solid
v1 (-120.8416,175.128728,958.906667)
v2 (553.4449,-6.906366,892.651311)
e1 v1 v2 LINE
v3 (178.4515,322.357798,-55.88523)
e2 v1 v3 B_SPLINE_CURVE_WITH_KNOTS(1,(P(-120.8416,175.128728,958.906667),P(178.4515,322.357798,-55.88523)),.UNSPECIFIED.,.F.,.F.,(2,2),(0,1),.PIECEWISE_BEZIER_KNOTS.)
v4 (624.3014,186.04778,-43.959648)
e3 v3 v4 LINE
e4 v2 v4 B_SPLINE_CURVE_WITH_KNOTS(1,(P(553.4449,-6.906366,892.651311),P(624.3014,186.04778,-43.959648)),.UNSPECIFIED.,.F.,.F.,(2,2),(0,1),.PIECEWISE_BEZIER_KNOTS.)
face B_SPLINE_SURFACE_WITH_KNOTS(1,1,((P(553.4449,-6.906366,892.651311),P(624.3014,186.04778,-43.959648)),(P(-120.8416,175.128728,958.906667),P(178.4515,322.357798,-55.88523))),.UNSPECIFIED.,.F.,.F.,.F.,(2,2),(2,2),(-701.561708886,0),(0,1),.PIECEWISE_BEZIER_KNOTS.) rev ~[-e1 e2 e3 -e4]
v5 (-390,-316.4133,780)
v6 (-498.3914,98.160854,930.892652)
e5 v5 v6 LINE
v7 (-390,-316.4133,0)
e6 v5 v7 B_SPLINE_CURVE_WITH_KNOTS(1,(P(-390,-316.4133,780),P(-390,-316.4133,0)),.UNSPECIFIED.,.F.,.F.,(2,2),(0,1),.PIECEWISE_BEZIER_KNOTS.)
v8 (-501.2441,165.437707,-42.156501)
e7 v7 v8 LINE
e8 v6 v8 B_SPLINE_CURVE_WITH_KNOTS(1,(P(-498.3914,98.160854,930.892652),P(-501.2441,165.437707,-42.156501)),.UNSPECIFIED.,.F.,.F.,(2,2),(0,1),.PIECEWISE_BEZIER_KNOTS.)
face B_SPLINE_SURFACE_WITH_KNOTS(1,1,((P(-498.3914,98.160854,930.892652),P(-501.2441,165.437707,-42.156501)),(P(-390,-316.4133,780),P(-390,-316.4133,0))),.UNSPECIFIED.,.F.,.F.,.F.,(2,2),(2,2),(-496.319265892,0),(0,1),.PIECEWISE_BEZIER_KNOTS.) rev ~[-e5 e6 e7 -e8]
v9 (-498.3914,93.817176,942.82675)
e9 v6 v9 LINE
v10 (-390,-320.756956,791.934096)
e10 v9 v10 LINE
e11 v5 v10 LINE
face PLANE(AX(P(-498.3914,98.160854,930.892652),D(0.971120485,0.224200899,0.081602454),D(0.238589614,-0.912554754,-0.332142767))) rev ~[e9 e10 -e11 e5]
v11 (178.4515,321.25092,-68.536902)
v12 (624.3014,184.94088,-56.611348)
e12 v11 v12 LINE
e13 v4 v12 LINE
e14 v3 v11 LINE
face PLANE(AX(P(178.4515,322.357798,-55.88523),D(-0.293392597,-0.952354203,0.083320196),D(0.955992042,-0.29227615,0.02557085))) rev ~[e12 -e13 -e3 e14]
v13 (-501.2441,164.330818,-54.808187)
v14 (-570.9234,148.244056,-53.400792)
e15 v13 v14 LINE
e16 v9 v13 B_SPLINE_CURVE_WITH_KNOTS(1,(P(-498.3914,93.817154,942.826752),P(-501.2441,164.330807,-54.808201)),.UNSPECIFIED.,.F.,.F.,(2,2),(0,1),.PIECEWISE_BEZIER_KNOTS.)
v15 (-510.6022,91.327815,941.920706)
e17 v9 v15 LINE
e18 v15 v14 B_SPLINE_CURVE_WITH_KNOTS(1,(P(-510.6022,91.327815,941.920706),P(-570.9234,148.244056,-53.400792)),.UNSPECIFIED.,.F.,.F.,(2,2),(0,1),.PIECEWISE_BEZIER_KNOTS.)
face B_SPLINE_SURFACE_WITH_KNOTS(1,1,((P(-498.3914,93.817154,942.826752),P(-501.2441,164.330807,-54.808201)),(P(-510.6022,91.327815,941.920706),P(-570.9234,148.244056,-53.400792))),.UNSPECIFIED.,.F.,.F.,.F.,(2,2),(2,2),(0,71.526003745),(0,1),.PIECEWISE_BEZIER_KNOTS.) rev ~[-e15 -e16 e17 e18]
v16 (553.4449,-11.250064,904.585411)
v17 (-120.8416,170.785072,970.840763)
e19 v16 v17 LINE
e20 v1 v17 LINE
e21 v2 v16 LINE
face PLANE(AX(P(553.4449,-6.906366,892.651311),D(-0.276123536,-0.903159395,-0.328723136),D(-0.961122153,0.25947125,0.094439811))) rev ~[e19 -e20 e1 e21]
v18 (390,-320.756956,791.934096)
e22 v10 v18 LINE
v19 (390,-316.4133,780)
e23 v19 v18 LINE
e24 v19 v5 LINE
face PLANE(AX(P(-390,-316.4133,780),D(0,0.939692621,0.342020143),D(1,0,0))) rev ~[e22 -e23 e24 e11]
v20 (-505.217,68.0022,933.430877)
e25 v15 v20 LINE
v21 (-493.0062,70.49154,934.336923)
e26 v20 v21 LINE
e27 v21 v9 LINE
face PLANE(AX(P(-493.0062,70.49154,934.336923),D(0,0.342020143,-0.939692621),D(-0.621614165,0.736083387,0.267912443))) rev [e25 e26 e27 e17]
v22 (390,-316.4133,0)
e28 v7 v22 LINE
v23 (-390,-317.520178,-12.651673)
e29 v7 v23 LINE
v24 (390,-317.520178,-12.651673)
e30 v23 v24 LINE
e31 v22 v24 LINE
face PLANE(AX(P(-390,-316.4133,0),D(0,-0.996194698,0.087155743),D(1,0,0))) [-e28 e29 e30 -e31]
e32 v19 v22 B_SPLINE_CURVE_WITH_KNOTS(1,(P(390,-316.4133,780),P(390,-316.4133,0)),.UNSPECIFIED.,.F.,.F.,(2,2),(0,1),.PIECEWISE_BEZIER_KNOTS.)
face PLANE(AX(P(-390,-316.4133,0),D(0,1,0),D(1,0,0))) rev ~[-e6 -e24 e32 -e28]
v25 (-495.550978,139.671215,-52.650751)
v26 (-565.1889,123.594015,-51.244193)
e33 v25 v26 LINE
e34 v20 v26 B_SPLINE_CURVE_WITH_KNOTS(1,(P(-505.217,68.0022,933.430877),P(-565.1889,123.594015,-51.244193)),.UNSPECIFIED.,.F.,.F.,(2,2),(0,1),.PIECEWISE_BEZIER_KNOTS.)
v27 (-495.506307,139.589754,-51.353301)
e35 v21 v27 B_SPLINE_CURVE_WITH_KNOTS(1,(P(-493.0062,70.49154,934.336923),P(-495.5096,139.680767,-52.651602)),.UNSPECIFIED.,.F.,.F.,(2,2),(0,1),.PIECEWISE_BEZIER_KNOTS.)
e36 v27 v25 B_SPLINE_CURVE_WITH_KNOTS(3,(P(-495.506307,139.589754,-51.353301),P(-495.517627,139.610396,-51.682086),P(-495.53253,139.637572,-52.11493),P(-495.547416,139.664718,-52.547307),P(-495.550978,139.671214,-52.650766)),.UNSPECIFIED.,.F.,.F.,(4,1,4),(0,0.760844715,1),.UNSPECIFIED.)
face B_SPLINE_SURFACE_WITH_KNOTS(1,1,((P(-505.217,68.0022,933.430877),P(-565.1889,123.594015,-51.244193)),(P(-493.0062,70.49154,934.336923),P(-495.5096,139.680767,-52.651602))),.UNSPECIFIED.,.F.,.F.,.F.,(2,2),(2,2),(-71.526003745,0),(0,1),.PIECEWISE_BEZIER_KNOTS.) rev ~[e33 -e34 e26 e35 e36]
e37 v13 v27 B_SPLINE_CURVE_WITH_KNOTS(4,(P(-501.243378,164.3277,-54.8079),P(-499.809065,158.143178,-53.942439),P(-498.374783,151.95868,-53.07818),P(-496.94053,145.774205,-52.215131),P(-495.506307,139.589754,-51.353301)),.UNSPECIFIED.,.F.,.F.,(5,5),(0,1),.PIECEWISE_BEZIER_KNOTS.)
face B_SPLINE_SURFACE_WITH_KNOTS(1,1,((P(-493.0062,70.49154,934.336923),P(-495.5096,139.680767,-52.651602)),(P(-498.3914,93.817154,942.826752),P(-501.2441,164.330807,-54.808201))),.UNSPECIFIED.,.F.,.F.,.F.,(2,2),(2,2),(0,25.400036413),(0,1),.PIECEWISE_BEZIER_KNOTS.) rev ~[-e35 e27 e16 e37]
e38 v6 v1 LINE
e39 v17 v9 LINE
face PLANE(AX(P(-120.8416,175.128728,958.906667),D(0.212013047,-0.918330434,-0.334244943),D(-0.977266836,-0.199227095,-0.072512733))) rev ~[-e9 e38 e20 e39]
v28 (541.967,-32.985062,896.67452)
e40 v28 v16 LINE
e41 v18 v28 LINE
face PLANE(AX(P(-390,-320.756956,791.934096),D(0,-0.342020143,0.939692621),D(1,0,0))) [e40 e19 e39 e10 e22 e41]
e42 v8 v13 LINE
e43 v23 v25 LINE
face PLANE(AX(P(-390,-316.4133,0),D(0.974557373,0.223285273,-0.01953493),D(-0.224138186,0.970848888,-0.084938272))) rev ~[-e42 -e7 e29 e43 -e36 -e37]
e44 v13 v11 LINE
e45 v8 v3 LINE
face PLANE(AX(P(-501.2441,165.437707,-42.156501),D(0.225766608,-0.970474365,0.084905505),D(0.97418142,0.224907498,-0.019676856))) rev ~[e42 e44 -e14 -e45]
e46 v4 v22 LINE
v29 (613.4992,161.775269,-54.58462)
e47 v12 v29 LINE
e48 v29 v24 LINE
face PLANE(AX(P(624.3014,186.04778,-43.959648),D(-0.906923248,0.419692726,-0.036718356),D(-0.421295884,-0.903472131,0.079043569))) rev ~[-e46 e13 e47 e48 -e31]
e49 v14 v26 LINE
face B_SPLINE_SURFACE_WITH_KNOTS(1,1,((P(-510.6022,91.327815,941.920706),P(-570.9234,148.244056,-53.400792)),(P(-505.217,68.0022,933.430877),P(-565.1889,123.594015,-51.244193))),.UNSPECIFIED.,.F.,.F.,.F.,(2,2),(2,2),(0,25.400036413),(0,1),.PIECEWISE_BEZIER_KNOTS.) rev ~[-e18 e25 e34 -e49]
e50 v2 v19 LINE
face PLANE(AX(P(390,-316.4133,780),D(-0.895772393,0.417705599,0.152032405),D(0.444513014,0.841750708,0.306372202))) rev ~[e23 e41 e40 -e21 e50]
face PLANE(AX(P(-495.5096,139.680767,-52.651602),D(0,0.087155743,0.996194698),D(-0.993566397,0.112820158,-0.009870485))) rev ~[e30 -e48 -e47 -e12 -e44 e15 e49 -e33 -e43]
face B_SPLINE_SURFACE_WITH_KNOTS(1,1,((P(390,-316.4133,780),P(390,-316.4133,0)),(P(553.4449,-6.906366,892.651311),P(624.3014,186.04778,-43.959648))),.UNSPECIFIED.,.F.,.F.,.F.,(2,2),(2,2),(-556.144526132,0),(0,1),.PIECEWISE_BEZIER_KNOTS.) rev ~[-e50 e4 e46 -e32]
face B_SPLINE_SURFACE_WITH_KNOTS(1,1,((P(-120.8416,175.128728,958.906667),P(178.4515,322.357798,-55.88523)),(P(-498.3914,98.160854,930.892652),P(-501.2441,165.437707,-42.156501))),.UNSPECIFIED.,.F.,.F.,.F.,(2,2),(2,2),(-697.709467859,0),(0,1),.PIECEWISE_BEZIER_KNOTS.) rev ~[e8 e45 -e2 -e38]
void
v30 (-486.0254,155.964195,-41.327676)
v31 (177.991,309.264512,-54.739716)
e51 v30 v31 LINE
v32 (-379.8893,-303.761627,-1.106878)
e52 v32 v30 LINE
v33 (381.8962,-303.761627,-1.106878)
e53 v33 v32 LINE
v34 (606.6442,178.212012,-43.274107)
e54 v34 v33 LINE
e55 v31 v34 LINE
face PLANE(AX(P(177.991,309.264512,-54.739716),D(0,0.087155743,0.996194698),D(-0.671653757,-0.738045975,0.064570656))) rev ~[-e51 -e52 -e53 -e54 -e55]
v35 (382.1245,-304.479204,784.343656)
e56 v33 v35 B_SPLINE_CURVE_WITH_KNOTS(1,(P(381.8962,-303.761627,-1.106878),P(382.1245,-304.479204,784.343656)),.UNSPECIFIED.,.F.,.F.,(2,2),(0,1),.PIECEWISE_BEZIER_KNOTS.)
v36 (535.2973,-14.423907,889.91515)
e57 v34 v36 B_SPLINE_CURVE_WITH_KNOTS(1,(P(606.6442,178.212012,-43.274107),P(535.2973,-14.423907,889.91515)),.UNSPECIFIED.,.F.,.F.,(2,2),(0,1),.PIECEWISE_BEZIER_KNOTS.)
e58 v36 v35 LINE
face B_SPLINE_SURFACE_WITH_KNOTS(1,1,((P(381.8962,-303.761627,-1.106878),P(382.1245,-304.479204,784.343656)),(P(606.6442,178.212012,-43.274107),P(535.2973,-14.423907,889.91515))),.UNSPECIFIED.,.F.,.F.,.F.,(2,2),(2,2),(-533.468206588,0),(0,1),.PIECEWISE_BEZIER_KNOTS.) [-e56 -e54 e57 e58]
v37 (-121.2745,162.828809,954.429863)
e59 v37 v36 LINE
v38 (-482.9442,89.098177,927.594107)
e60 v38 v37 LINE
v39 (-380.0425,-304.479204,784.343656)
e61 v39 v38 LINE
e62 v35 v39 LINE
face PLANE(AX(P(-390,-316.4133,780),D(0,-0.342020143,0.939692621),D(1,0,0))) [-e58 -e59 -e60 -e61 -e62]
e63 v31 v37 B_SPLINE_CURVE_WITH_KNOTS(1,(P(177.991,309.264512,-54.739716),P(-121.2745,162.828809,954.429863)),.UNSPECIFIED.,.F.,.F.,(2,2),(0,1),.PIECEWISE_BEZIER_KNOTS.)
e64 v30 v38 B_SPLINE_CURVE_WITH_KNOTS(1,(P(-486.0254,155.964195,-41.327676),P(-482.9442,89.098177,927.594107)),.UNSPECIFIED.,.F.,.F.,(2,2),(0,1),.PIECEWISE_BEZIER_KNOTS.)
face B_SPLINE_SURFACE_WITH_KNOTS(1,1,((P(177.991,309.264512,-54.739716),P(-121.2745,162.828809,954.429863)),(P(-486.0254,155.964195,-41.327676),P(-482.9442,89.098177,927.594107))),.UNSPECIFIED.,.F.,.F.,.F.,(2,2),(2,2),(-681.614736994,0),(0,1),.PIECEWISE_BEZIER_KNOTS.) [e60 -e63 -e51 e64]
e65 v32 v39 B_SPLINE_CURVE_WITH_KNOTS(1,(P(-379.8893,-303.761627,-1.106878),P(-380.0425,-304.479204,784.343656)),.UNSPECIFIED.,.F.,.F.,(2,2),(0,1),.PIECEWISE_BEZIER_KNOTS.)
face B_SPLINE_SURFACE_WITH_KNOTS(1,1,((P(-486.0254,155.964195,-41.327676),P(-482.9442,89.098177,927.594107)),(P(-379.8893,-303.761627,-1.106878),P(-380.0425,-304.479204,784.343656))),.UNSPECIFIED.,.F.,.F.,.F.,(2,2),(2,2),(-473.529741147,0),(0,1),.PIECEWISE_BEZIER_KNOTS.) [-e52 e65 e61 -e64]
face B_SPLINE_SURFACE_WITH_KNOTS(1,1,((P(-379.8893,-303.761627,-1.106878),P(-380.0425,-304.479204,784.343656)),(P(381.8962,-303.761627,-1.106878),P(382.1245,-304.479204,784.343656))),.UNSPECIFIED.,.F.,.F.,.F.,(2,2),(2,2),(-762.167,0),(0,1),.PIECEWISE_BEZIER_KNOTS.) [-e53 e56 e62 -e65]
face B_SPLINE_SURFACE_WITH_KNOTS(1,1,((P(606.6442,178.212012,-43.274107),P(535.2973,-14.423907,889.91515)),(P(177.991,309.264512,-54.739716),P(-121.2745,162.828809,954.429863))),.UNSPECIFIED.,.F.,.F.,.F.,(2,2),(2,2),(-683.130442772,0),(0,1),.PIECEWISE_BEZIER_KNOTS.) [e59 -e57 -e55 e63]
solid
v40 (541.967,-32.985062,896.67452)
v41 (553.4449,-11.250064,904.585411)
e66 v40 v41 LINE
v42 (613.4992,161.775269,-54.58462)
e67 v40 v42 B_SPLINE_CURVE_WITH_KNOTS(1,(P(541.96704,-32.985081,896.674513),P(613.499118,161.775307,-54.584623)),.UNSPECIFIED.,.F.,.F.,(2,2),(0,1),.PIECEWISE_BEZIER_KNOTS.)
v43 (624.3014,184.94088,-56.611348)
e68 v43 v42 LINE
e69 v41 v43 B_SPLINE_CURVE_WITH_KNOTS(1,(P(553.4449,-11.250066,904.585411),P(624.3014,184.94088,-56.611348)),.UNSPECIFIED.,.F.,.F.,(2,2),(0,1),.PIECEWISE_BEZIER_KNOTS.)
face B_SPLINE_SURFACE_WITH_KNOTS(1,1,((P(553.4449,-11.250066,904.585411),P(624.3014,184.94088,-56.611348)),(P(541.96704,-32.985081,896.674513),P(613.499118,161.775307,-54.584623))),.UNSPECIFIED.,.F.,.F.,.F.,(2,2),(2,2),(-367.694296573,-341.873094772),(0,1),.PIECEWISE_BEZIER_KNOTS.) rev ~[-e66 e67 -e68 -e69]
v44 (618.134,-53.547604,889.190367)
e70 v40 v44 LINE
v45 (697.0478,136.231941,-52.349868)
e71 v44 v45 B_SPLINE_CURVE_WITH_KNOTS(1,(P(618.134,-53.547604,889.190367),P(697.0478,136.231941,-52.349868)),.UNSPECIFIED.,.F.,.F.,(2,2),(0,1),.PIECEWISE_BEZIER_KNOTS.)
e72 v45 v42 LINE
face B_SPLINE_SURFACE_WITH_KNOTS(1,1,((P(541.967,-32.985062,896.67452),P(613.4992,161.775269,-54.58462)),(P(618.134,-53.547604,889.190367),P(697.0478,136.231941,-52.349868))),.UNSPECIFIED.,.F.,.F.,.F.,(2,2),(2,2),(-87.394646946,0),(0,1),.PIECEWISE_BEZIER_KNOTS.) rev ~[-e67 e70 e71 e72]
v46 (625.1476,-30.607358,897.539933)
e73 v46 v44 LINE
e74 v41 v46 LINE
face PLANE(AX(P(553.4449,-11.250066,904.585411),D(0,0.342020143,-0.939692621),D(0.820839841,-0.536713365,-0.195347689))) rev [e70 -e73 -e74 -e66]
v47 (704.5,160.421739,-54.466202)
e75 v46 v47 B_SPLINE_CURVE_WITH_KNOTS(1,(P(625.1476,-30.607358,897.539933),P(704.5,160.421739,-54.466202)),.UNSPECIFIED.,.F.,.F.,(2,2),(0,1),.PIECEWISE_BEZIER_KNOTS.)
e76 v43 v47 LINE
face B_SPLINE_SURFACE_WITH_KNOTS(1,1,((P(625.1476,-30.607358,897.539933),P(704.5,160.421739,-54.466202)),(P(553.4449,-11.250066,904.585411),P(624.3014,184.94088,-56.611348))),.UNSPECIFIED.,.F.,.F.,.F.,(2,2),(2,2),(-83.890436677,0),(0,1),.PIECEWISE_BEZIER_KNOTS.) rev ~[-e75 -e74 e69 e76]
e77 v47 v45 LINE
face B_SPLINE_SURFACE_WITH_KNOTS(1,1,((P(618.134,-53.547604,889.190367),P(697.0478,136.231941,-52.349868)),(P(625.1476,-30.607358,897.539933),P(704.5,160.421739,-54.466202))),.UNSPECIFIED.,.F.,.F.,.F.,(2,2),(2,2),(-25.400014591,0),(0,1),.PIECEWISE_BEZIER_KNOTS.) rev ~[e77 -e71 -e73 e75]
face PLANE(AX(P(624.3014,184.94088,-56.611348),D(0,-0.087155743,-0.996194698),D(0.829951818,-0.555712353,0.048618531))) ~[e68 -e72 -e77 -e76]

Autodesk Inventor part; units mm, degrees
ref_plane "YZ Plane" through (0, 0, 0) normal (1, 0, 0) x (0, 1, 0)
sketch "Sketch1" plane through (0, 0, 0) normal (0, 0, 1) x (1, 0, 0)
  line L0 (-390, -316.4133) -> (390, -316.4133)
  line L1 (390, -316.4133) -> (624.3014, 186.0477)
  line L2 (624.3014, 186.0477) -> (178.4515, 322.3577)
  line L3 (178.4515, 322.3577) -> (-501.2441, 165.4377)
  line L4 (-501.2441, 165.4377) -> (-390, -316.4133)
  point P0 (0, 0)
  point P1 (0, -316.4133)
  dimension "d4" = 780
  dimension "d5" = 103
  dimension "d6" = 150
  dimension "d7" = 82
  dimension "d8" = 115
  dimension "d9" = 90
ref_plane "Work Plane1" through (0, 0, 780) normal (0, 0, 1) x (1, 0, 0)
sketch "Sketch2" plane through (0, 0, 780) normal (0, 0, 1) x (1, 0, 0)
  line L0 (-390, -316.4133) -> (390, -316.4133) projected
  line L1 (-390, -316.4133) -> (-498.3914, 153.0812)
  line L2 (-498.3914, 153.0812) -> (-120.8416, 240.2454)
  line L3 (-120.8416, 240.2454) -> (553.4449, 34.0954)
  line L4 (553.4449, 34.0954) -> (390, -316.4133)
  point P0 (0, 0)
  dimension "d14" = 82
  dimension "d57" = 103
  dimension "d58" = 115
ref_plane "Work Plane2" through (-390, -316.4133, 0) normal (0, 0.0871557, 0.9961947) x (1, 0, 0)
sketch "Sketch6" plane through (-390, -316.4133, 0) normal (0, 0.0871557, 0.9961947) x (1, 0, 0)
  line L0 (568.4515, 641.2111) -> (1014.3014, 504.3804) projected
  line L1 (-111.2441, 483.6916) -> (568.4515, 641.2111) projected
  line L2 (0, 0) -> (-111.2441, 483.6916) projected
  line L3 (0, 0) -> (780, 0) projected
  line L4 (1014.3014, 504.3804) -> (780, 0) projected
  point P0 (390, 315.2093)
extrude "Extrusion2" add sketch "Sketch6" against normal blind 12.7
ref_plane "Work Plane3" through (-390, -316.4133, 780) normal (0, -0.3420201, 0.9396926) x (1, 0, 0)
sketch "Sketch7" plane through (-390, -316.4133, 780) normal (0, -0.3420201, 0.9396926) x (1, 0, 0)
  line L0 (-108.3914, 441.1806) -> (269.1584, 523.0881) projected
  line L1 (0, 0) -> (-108.3914, 441.1806) projected
  line L2 (269.1584, 523.0881) -> (943.4449, 329.3704) projected
  line L3 (943.4449, 329.3704) -> (780, 0) projected
  line L4 (-108.3914, 441.1806) -> (0, 0)
  line L5 (780, 0) -> (0, 0)
  line L6 (780, 0) -> (943.4449, 329.3704)
  line L7 (943.4449, 329.3704) -> (269.1584, 523.0881)
  line L8 (269.1584, 523.0881) -> (-108.3914, 441.1806)
  point P0 (390, 30.5555)
loft "Loft3" add profiles "Sketch7" section 2 edges at (401.3765, 254.2027, -49.9224) (-161.3963, 243.8977, -49.0209) (-445.622, -75.4878, -21.0782) (0, -316.4133, 0) (507.1507, -65.1828, -21.9798)
sketch "Sketch8" plane through (-390, -316.4133, 0) normal (0, 0.0871557, 0.9961947) x (1, 0, 0)
  line L0 (568.4515, 641.2111) -> (1014.3014, 504.3804) construction
  line L1 (1014.3014, 504.3804) -> (780, 0) construction
  line L2 (780, 0) -> (0, 0) construction
  line L3 (0, 0) -> (-111.2441, 483.6916) construction
  line L4 (-111.2441, 483.6916) -> (568.4515, 641.2111) construction
  line L5 (567.991, 628.0678) -> (996.6442, 496.5147)
  line L6 (996.6442, 496.5147) -> (771.8962, 12.7)
  line L7 (771.8962, 12.7) -> (10.1107, 12.7)
  line L8 (10.1107, 12.7) -> (-96.0254, 474.1819)
  line L9 (-96.0254, 474.1819) -> (567.991, 628.0678)
  point P0 (390, 315.2093)
  dimension "d37" = 12.7
sketch "Sketch9" plane through (-390, -316.4133, 780) normal (0, -0.3420201, 0.9396926) x (1, 0, 0)
  line L0 (-108.3914, 441.1806) -> (0, 0) construction
  line L1 (0, 0) -> (780, 0) construction
  line L2 (780, 0) -> (943.4449, 329.3704) construction
  line L3 (943.4449, 329.3704) -> (269.1584, 523.0881) construction
  line L4 (269.1584, 523.0881) -> (-108.3914, 441.1806) construction
  line L5 (268.7255, 509.9988) -> (925.2973, 321.3704)
  line L6 (925.2973, 321.3704) -> (772.1245, 12.7)
  line L7 (772.1245, 12.7) -> (9.9575, 12.7)
  line L8 (9.9575, 12.7) -> (-92.9442, 431.5363)
  line L9 (-92.9442, 431.5363) -> (268.7255, 509.9988)
  point P0 (390, 30.5555)
  dimension "d38" = 12.7
loft "Loft4" cut profiles "Sketch8", "Sketch9"
sketch "Sketch10" plane through (-390, -316.4133, 780) normal (0, -0.3420201, 0.9396926) x (1, 0, 0)
  line L0 (943.4449, 329.3704) -> (269.1584, 523.0881) projected
  line L1 (269.1584, 523.0881) -> (-108.3914, 441.1806) projected
  line L2 (-108.3914, 441.1806) -> (0, 0) projected
  line L3 (0, 0) -> (780, 0) projected
  line L4 (780, 0) -> (943.4449, 329.3704) projected
  point P0 (390, 30.5555)
extrude "Extrusion3" add sketch "Sketch10" along normal blind 12.7
sketch "Sketch11" plane through (-390, -317.5202, -12.6517) normal (0, -0.0871557, -0.9961947) x (-1, 0, 0)
  line L0 (-1014.3014, 504.3804) -> (-568.4515, 641.2111) projected
  line L1 (-1014.3014, 504.3804) -> (-1094.5, 479.7676)
  line L2 (-1094.5, 479.7676) -> (-1087.0478, 455.4854)
  line L3 (-1087.0478, 455.4854) -> (-1003.4992, 481.1263)
  line L4 (-780, 0) -> (-1014.3014, 504.3804) projected
  line L5 (-943.4449, 230.5295) -> (-1014.3014, 504.3804) projected
  line L6 (-1003.4992, 481.1263) -> (-1014.3014, 504.3804)
  point P0 (-390, 315.2093)
  dimension "d46" = 25.4
sketch "Sketch12" plane through (-390, -320.757, 791.9341) normal (0, -0.3420201, 0.9396926) x (1, 0, 0)
  line L0 (943.4449, 329.3704) -> (1014.3014, 190.3481) projected
  line L1 (943.4449, 329.3704) -> (1015.1476, 308.7708)
  line L2 (943.4449, 329.3704) -> (269.1584, 523.0881) projected
  line L3 (1015.1476, 308.7708) -> (1008.134, 284.3583)
  line L4 (1008.134, 284.3583) -> (931.967, 306.2405)
  line L5 (780, 0) -> (943.4449, 329.3704) projected
  line L6 (931.967, 306.2405) -> (943.4449, 329.3704)
  point P0 (390, 30.5555)
  dimension "d45" = 25.4
loft "Loft5" add profiles "Sketch12", "Sketch11"
sketch "Sketch13" plane through (-390, -320.757, 791.9341) normal (0, -0.3420201, 0.9396926) x (1, 0, 0)
  line L0 (269.1584, 523.0881) -> (-108.3914, 441.1806) projected
  line L1 (-108.3914, 441.1806) -> (-120.6022, 438.5315)
  line L2 (-120.6022, 438.5315) -> (-115.217, 413.7089)
  line L3 (-115.217, 413.7089) -> (-103.0062, 416.358)
  line L4 (-108.3914, 441.1806) -> (0, 0) projected
  line L5 (-103.0062, 416.358) -> (-108.3914, 441.1806)
  point P0 (390, 30.5555)
  dimension "d51" = 25.4
sketch "Sketch14" plane through (-390, -317.5202, -12.6517) normal (0, -0.0871557, -0.9961947) x (-1, 0, 0)
  line L0 (-568.4515, 641.2111) -> (111.2441, 483.6916) projected
  line L1 (111.2441, 483.6916) -> (180.9234, 467.5434)
  line L2 (180.9234, 467.5434) -> (175.1889, 442.7992)
  line L3 (175.1889, 442.7992) -> (105.5096, 458.9474)
  line L4 (108.3914, 331.8639) -> (111.2441, 483.6916) projected
  line L5 (105.5096, 458.9474) -> (111.2441, 483.6916)
  point P0 (-390, 315.2093)
  dimension "d52" = 25.4
loft "Loft6" add profiles "Sketch13", "Sketch14"
properties part number "fuckeduphouse"
